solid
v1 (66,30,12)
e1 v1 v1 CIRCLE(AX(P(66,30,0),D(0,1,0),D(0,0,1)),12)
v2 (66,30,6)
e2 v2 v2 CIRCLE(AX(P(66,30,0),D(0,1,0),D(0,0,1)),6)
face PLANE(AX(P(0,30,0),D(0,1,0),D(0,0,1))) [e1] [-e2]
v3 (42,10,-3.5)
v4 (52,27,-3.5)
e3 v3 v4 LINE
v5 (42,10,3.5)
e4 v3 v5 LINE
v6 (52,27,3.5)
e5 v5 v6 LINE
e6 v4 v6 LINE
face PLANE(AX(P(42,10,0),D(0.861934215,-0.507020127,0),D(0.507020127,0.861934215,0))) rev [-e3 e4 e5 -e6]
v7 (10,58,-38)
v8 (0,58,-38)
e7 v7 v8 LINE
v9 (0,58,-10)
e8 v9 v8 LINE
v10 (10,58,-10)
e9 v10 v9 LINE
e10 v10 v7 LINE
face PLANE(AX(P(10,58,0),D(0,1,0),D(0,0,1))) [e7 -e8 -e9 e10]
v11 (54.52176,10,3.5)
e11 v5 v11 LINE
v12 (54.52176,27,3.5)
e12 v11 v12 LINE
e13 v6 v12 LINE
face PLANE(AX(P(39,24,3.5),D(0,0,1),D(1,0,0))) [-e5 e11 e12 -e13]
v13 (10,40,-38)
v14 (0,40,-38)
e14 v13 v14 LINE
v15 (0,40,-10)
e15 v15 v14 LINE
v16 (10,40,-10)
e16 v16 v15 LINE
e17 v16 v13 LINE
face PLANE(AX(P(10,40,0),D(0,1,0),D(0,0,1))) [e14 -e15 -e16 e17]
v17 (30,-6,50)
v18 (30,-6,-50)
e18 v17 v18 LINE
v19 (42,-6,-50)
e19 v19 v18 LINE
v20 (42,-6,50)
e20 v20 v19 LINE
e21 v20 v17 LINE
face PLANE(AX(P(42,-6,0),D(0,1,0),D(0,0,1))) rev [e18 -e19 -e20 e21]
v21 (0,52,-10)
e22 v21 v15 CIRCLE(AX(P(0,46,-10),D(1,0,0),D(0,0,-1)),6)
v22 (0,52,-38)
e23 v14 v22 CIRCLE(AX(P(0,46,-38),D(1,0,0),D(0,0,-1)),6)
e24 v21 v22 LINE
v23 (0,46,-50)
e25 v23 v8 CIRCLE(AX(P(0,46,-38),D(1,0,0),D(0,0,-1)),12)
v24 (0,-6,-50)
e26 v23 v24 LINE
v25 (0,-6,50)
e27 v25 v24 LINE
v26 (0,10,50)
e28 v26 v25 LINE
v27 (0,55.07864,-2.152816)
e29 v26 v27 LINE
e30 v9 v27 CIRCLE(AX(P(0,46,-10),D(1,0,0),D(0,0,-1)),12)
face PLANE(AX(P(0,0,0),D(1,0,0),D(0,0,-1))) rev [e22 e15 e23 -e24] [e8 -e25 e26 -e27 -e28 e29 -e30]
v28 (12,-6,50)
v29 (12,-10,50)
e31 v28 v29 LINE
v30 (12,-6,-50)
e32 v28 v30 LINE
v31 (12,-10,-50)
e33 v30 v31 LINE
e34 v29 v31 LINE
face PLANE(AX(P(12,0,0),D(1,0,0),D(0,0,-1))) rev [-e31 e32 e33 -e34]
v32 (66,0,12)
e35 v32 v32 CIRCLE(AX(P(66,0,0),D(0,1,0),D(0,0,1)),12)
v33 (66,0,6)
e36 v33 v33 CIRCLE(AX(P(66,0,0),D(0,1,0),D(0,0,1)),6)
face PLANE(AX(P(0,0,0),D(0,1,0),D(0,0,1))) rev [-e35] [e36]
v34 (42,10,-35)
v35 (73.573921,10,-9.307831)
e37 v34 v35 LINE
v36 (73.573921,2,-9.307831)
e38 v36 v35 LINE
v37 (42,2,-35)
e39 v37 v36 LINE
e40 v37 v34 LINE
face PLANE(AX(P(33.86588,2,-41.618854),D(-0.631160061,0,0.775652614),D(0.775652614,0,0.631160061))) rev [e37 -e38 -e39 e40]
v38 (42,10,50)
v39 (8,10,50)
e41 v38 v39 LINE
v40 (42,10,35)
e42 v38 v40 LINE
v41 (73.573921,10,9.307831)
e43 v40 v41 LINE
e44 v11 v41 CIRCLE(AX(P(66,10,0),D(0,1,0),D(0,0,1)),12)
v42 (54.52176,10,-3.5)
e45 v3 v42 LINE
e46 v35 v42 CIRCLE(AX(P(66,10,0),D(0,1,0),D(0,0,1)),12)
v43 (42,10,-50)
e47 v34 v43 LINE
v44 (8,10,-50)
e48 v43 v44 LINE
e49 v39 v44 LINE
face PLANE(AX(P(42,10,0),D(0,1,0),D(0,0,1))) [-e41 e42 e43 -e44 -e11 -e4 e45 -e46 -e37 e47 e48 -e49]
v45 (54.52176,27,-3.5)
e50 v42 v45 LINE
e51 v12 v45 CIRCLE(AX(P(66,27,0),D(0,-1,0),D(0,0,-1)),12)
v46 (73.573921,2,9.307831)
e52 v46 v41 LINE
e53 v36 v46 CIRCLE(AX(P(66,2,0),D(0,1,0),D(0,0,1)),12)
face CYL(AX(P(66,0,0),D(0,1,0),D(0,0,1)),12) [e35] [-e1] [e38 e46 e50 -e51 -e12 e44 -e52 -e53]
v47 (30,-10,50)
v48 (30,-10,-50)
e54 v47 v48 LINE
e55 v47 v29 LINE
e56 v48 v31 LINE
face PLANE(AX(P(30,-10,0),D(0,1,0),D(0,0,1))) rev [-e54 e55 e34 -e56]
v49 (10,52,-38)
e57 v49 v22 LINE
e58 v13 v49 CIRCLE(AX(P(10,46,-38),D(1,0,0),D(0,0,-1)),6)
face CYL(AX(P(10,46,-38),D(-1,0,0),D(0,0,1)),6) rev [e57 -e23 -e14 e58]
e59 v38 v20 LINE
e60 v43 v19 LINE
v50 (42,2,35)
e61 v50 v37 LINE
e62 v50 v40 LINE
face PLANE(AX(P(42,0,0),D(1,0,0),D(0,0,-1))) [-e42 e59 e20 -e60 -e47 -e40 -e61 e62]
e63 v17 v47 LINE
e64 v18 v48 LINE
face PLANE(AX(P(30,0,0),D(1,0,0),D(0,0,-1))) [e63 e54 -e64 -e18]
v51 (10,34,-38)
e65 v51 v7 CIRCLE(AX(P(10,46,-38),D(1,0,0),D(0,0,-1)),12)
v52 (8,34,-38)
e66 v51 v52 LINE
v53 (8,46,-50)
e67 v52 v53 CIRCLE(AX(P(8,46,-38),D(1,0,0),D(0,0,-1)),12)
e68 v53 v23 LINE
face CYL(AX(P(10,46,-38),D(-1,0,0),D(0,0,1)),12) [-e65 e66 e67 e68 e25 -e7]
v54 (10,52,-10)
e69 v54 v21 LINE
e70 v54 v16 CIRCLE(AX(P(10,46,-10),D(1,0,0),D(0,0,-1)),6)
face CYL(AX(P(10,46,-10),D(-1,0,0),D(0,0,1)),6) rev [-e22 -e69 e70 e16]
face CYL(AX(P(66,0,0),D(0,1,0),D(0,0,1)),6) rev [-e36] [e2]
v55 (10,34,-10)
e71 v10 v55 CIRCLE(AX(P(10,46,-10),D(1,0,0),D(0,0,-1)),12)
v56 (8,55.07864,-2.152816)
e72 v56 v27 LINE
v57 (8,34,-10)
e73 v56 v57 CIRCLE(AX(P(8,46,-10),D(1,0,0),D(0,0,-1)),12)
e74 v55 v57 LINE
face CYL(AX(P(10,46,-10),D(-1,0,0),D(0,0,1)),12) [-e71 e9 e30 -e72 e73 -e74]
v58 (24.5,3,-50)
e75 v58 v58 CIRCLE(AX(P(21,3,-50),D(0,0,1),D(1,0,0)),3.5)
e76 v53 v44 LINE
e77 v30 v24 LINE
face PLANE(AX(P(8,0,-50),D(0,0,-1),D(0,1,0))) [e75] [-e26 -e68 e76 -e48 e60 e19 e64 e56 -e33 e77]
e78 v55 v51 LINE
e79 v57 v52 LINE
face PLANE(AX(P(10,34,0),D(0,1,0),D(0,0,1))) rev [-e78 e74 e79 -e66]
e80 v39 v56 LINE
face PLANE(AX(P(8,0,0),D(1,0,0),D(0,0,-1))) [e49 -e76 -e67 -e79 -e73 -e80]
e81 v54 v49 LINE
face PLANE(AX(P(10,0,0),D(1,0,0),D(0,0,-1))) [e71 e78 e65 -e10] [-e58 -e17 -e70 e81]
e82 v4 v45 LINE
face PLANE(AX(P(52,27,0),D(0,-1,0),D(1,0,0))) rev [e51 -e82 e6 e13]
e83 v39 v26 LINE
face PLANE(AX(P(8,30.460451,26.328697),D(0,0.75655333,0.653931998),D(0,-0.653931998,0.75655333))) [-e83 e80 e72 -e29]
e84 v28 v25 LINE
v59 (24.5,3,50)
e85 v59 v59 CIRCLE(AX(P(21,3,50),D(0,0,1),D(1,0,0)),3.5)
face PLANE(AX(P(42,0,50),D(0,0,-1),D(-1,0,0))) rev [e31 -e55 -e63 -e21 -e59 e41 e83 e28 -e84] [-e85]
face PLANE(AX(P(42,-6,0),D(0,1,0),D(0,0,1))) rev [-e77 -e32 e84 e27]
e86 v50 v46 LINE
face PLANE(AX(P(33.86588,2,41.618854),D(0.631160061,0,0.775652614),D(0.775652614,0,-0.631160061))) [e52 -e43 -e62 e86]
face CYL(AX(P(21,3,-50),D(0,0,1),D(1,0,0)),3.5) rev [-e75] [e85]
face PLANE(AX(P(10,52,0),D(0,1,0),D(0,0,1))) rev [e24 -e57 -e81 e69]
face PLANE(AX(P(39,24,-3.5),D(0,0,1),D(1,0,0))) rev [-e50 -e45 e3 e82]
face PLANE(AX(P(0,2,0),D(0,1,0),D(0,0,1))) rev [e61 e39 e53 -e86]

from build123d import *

# Parameters (mm, degrees)
EXTRUDE_1_DEPTH      = 8
EXTRUDE_2_DEPTH      = 10
SKETCH_1_5_W         = 100
SKETCH_1_5_H         = 16
EXTRUDE_3_DEPTH      = 42
EXTRUDE_START        = 12
SKETCH_1_6_W         = 100
SKETCH_1_6_H         = 4
EXTRUDE_4_DEPTH      = 18
SKETCH_2_R           = 3.5
CUT_EXTRUDE_4_DEPTH  = 123.995934892
EXTRUDE_7_DEPTH      = 8
EXTRUDE_8_DEPTH      = 20
EXTRUDE_8_DEPTH_BACK = 10
RIB_START            = -3.5
RIB_2_DEPTH          = 7


# Read off the part's stored shape, not the designer's step: 筋2
with BuildPart() as part:
    # 草图1 → 凸台-拉伸1 (new body)
    with BuildSketch(Plane(origin=(0, 0, 0), x_dir=(0, 0, -1), z_dir=(1, 0, 0))):
        with BuildLine():
            Line((2.152816021, 55.078639964), (-50, 10))
            Line((-50, 10), (50, 10))
            Line((50, 10), (50, 46))
            ThreePointArc((50, 46), (46.485281374, 37.514718626), (38, 34))
            Line((38, 34), (10, 34))
            ThreePointArc((10, 34), (-1.245969935, 41.813335431), (2.152816021, 55.078639964))
        make_face()
    extrude(amount=EXTRUDE_1_DEPTH)

    # 草图1<3> → 凸台-拉伸2 (add)
    with BuildSketch(Plane(origin=(0, 0, 0), x_dir=(0, 0, -1), z_dir=(1, 0, 0))):
        with BuildLine():
            ThreePointArc((38, 34), (50, 46), (38, 58))
            Line((38, 58), (10, 58))
            ThreePointArc((10, 58), (-2, 46), (10, 34))
            Line((10, 34), (38, 34))
        make_face()
        with BuildLine():
            ThreePointArc((38, 40), (44, 46), (38, 52))
            Line((38, 52), (10, 52))
            ThreePointArc((10, 52), (4, 46), (10, 40))
            Line((10, 40), (38, 40))
        make_face(mode=Mode.SUBTRACT)
    extrude(amount=EXTRUDE_2_DEPTH)

    # 草图1<5> → 凸台-拉伸3 (add)
    with BuildSketch(Plane(origin=(0, 0, 0), x_dir=(0, 0, -1), z_dir=(1, 0, 0))):
        with Locations((0, 2)):
            Rectangle(SKETCH_1_5_W, SKETCH_1_5_H)
    extrude(amount=EXTRUDE_3_DEPTH)

    # 草图1<6> → 凸台-拉伸4 (add)
    with BuildSketch(Plane(origin=(0, 0, 0), x_dir=(0, 0, -1), z_dir=(1, 0, 0)).offset(EXTRUDE_START)):
        with Locations((0, -8)):
            Rectangle(SKETCH_1_6_W, SKETCH_1_6_H)
    extrude(amount=EXTRUDE_4_DEPTH)

    # 草图2 → 切除-拉伸4 (cut, through all)
    with BuildSketch(Plane.XY.offset(50)):
        with Locations((21, 3)):
            Circle(SKETCH_2_R)
    extrude(amount=-CUT_EXTRUDE_4_DEPTH, mode=Mode.SUBTRACT)

    # 草图4 → 凸台-拉伸7 (add)
    with BuildSketch(Plane(origin=(0, 10, 0), x_dir=(1, 0, 0), z_dir=(0, 1, 0))):
        with BuildLine():
            ThreePointArc((54, 0), (60.846702456, 10.837136357), (73.573920737, 9.307831362))
            Line((73.573920737, 9.307831362), (42, 35))
            Line((42, 35), (42, 0))
            Line((42, 0), (54, 0))
        make_face()
        with BuildLine():
            Line((42, -35), (73.573920737, -9.307831362))
            ThreePointArc((73.573920737, -9.307831362), (60.846702456, -10.837136357), (54, 0))
            Line((54, 0), (42, 0))
            Line((42, 0), (42, -35))
        make_face()
    extrude(amount=-EXTRUDE_7_DEPTH)

    # 草图4<3> → 凸台-拉伸8 (add, two sides: drawn at the far end of the back side and taken through both)
    with BuildSketch(Plane(origin=(0, 10, 0), x_dir=(1, 0, 0), z_dir=(0, 1, 0)).offset(-EXTRUDE_8_DEPTH_BACK)):
        with BuildLine():
            ThreePointArc((60, 0), (66, 6), (72, 0))
            Line((72, 0), (78, 0))
            ThreePointArc((78, 0), (76.837136357, 5.153297544), (73.573920737, 9.307831362))
            ThreePointArc((73.573920737, 9.307831362), (60.846702456, 10.837136357), (54, 0))
            Line((54, 0), (60, 0))
        make_face()
        with BuildLine():
            Line((78, 0), (72, 0))
            ThreePointArc((72, 0), (66, -6), (60, 0))
            Line((60, 0), (54, 0))
            ThreePointArc((54, 0), (60.846702456, -10.837136357), (73.573920737, -9.307831362))
            ThreePointArc((73.573920737, -9.307831362), (76.837136357, -5.153297544), (78, 0))
        make_face()
    extrude(amount=EXTRUDE_8_DEPTH + EXTRUDE_8_DEPTH_BACK)

    # 筋2 outline → 筋2 (add)
    with BuildSketch(Plane.XY.offset(RIB_START)):
        Polygon((56, 27), (52, 27), (42, 10), (56, 10), align=None)
    extrude(amount=RIB_2_DEPTH)


solid = part.part
